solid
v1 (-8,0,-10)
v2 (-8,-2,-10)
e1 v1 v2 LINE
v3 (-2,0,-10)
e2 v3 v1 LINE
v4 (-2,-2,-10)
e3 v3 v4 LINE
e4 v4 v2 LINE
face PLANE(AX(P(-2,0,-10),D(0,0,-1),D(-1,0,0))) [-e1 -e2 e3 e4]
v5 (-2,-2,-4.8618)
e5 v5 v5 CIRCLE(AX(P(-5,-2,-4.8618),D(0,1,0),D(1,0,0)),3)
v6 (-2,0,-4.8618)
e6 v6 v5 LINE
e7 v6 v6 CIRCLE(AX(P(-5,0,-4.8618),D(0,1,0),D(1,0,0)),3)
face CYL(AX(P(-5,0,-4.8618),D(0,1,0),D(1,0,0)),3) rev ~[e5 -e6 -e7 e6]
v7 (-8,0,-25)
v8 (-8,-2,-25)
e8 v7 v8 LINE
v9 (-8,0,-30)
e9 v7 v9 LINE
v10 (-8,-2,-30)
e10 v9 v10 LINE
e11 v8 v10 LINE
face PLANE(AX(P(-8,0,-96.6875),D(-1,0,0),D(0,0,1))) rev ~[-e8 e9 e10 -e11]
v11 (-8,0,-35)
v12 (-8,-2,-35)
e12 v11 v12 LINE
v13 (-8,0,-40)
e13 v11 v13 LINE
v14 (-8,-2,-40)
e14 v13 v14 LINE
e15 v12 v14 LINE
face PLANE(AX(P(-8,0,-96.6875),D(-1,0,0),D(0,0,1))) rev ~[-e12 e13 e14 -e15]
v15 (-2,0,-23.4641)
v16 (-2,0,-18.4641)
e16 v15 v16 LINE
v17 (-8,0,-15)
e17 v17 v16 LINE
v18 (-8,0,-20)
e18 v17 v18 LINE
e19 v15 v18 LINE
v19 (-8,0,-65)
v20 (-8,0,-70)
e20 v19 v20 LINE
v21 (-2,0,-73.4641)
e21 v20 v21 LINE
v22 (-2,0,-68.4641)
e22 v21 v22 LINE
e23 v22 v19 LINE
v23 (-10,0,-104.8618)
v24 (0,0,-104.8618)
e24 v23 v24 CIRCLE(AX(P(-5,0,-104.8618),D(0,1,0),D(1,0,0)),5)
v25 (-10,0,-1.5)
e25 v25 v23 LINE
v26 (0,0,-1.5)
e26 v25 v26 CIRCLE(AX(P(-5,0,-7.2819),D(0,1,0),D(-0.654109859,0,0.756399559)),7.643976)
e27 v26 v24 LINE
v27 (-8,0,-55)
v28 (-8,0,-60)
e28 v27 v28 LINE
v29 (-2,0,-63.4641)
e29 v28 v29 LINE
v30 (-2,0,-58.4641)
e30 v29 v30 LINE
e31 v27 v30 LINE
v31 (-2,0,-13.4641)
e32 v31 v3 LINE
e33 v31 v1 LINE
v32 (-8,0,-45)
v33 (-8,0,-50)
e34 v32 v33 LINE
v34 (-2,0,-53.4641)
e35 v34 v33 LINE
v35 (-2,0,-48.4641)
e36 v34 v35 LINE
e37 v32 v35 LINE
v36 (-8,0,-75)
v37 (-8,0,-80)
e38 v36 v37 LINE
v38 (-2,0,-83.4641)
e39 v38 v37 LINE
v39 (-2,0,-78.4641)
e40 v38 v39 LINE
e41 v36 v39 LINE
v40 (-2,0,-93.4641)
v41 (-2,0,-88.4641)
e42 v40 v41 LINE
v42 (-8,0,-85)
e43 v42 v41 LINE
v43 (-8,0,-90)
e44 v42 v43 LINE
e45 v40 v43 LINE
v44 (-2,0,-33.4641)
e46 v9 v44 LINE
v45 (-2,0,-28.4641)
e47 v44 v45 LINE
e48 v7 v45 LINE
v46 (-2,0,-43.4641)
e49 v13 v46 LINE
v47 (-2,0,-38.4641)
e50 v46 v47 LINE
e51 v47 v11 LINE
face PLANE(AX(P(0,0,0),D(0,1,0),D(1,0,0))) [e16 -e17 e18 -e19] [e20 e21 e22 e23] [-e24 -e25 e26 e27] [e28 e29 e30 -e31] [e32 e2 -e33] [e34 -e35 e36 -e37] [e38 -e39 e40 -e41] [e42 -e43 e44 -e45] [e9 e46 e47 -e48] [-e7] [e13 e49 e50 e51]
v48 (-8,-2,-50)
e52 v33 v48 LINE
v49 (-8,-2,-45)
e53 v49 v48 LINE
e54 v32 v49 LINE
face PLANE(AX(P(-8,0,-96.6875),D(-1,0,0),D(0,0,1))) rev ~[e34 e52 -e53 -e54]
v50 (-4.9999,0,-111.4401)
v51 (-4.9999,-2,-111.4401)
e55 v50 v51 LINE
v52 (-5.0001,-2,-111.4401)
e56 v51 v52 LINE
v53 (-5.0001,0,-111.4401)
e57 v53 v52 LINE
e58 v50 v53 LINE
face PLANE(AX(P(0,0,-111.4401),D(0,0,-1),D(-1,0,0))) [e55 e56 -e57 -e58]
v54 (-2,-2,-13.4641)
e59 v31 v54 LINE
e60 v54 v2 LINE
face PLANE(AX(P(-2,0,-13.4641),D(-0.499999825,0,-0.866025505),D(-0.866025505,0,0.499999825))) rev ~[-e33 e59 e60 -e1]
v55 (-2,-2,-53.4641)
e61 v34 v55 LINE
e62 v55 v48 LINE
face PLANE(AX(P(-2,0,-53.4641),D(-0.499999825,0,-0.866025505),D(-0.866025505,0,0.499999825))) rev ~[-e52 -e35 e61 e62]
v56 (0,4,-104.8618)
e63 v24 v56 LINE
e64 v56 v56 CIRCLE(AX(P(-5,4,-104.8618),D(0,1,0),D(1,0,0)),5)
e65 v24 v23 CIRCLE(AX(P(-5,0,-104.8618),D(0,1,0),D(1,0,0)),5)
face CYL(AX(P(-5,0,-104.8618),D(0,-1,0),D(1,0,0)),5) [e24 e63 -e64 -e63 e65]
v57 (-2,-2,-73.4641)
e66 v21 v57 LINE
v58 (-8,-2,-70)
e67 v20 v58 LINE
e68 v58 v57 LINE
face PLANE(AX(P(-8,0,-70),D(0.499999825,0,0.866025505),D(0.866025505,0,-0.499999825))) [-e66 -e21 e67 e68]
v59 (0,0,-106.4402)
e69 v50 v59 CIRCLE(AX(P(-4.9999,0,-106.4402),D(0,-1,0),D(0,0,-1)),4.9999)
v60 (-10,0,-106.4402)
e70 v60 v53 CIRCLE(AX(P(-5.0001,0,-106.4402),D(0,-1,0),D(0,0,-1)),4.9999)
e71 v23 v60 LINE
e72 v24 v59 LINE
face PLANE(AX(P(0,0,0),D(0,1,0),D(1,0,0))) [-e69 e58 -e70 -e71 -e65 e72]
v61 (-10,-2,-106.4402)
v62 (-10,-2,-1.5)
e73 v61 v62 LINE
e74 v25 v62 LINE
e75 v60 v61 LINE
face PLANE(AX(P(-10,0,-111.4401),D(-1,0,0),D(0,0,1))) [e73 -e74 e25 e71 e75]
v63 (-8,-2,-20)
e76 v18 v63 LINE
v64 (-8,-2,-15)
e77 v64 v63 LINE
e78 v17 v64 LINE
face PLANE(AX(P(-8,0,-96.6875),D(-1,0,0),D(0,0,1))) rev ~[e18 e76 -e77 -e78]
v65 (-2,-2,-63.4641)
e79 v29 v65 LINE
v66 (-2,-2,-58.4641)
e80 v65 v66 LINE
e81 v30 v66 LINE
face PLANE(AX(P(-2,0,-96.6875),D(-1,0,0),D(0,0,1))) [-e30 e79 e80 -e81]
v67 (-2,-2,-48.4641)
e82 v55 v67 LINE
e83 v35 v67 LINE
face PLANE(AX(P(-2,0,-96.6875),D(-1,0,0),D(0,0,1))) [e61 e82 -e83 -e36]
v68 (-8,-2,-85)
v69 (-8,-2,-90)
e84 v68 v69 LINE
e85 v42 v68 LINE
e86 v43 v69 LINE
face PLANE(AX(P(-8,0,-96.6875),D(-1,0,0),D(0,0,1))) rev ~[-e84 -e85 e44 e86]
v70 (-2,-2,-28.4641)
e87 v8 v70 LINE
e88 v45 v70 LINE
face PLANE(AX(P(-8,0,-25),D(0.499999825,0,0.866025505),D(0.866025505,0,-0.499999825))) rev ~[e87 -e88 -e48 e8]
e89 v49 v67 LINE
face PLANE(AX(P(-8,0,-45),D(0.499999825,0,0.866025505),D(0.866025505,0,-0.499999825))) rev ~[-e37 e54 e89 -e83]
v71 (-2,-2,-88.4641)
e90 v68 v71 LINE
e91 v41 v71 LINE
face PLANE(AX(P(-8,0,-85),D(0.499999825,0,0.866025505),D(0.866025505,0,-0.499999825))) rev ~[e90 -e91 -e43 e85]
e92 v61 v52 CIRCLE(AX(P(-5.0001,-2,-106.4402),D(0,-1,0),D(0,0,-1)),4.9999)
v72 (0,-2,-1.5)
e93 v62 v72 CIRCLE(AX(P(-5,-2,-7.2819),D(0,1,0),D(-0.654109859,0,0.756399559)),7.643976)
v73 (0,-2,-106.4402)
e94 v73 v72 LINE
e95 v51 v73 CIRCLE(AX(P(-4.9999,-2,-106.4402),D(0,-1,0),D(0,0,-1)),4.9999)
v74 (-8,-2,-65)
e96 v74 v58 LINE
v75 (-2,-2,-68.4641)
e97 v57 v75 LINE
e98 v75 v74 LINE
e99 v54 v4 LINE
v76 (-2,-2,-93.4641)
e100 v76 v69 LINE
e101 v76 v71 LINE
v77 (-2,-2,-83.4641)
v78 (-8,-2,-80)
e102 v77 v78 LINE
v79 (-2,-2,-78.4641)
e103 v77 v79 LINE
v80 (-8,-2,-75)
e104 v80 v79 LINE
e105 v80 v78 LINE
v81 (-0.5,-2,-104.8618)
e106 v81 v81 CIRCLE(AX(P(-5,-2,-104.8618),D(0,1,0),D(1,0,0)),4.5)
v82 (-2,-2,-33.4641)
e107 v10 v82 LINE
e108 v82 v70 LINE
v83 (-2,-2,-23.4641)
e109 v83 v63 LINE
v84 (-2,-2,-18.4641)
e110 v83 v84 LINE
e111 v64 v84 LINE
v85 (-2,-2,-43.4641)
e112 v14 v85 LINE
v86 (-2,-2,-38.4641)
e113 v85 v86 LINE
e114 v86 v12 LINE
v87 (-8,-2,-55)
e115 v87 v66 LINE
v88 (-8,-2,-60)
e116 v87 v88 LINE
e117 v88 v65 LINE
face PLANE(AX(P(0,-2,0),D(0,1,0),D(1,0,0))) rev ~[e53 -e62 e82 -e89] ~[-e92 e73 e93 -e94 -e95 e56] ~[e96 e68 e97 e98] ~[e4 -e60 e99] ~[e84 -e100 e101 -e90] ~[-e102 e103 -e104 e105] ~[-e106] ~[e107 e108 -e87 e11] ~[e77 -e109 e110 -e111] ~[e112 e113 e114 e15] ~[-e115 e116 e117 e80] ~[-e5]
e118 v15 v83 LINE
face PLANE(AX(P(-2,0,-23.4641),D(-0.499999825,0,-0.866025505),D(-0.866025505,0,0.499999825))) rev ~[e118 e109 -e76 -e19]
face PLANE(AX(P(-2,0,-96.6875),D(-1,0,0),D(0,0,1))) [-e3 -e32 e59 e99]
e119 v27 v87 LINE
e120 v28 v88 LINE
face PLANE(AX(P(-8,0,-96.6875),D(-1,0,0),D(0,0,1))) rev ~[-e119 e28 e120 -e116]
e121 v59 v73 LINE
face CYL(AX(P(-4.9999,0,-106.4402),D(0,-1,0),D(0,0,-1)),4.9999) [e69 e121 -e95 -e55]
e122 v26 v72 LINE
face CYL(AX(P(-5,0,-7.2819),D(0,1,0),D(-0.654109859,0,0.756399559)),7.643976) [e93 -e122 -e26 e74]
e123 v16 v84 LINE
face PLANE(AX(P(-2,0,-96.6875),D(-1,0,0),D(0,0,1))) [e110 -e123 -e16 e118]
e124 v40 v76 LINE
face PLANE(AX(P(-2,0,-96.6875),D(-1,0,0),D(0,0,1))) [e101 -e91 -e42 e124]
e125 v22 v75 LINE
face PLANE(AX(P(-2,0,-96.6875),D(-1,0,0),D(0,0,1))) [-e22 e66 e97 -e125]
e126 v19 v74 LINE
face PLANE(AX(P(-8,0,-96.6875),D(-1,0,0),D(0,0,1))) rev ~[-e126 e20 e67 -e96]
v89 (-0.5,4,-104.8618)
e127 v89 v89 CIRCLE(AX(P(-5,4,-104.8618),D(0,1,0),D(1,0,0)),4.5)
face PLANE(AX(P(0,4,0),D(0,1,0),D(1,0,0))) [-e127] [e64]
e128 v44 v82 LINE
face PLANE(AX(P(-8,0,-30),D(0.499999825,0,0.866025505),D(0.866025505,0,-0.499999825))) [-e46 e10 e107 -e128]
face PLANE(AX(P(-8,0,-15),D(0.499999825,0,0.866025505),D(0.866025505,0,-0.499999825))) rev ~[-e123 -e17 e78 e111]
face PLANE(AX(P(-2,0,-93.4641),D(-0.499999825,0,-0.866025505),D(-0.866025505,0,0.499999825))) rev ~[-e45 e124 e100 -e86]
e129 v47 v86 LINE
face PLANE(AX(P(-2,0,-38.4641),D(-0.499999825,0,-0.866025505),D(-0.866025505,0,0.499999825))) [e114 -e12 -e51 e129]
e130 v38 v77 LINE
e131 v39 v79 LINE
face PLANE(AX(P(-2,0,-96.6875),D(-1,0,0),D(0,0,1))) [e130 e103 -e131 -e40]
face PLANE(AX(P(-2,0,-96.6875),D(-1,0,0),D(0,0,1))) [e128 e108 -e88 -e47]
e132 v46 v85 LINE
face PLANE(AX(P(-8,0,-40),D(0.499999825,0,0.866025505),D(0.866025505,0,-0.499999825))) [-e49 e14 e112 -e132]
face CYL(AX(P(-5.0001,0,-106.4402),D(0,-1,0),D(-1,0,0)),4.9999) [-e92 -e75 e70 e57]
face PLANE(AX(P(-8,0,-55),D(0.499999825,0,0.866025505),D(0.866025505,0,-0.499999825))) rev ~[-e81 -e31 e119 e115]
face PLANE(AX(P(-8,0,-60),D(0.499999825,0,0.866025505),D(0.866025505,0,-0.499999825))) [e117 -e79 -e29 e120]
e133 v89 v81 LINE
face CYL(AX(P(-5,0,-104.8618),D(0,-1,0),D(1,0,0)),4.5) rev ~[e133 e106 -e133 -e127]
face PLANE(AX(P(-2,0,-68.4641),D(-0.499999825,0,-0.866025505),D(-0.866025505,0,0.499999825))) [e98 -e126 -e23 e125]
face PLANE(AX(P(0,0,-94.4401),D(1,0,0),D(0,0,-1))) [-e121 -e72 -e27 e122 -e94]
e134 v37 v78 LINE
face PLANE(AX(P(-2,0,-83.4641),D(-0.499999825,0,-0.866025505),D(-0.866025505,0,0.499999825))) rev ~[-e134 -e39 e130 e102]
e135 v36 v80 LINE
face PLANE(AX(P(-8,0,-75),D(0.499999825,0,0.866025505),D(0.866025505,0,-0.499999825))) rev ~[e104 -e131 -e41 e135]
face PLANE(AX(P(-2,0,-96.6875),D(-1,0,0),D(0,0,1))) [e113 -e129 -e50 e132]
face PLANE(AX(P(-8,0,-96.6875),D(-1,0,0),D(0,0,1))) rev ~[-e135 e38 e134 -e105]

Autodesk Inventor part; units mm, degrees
ref_plane "YZ Plane" through (0, 0, 0) normal (1, 0, 0) x (0, 1, 0)
ref_plane "XZ Plane" through (0, 0, 0) normal (0, 1, 0) x (-1, 0, 0)
sketch "Szkic3" plane through (0, 0, 0) normal (0, 1, 0) x (-1, 0, 0)
  line L0 (0, 0) -> (10, 0)
  line L1 (10, 0) -> (10, -50)
  line L2 (10, -50) -> (0, -50)
  line L3 (0, -50) -> (0, 0)
  circle A0 centre (5, -5) radius 2.5
  arc A1 (10, -2.5) -> (0, -2.5) centre (5, -6.25) ccw
  line L4 (8, -50) -> (2, -50)
  line L5 (2, -50) -> (2, -10)
  line L6 (2, -10) -> (8, -10)
  line L7 (8, -10) -> (8, -50)
  line L8 (2, -10) -> (8, -16)
  line L9 (2, -10) -> (10.4853, -10) construction
  line L10 (8, -16) -> (8, -18)
  line L11 (8, -18) -> (2, -12)
  line L12 (2, -10) -> (2, -12)
  line L13 (8, -18) -> (8, -22)
  line L14 (2, -16) -> (8, -22)
  line L15 (8, -24) -> (2, -18)
  line L16 (8, -16) -> (8, -14)
  line L17 (8, -24) -> (8, -26)
  line L18 (2, -20) -> (8, -26)
  line L19 (8, -28) -> (2, -22)
  line L20 (8, -28) -> (8, -32)
  line L21 (2, -26) -> (8, -32)
  line L22 (8, -34) -> (2, -28)
  line L23 (8, -34) -> (8, -36)
  line L24 (2, -26) -> (8, -32)
  line L25 (8, -34) -> (2, -28)
  line L26 (8, -34) -> (8, -38)
  line L27 (2, -32) -> (8, -38)
  line L28 (8, -40) -> (2, -34)
  line L29 (8, -40) -> (8, -42)
  line L30 (2, -32) -> (8, -38)
  line L31 (8, -40) -> (2, -34)
  line L32 (8, -40) -> (8, -44)
  line L33 (2, -38) -> (8, -44)
  line L34 (8, -46) -> (2, -40)
  line L35 (8, -46) -> (8, -48)
  line L36 (2, -38) -> (8, -44)
  line L37 (8, -46) -> (2, -40)
  line L38 (8, -46) -> (8, -50)
  line L39 (8, -46) -> (8, -48)
  line L40 (8, -48) -> (2, -42)
  line L41 (2, -42) -> (2, -44)
  line L42 (2, -44) -> (8, -50)
  line L43 (7, -49) -> (2, -49)
  circle A2 centre (5, -5) radius 3.25
  dimension "d9" = 10
  dimension "d10" = 50
  dimension "d11" = 5
  dimension "d12" = 6
  dimension "d13" = 40
  dimension "d14" = 45
  dimension "d15" = 2
  dimension "d16" = 4
  dimension "d17" = 2
  dimension "d18" = 2
  dimension "d19" = 2
  dimension "d20" = 2
  dimension "d21" = 4
  dimension "d22" = 2
  dimension "d23" = 2
  dimension "d24" = 2
  dimension "d25" = 4
  dimension "d26" = 2
  dimension "d27" = 2
  dimension "d28" = 2
  dimension "d29" = 4
  dimension "d30" = 2
  dimension "d32" = 2
  dimension "d36" = 2
  dimension "d37" = 2
  dimension "d42" = 6.5
extrude "Wyciągnięcie proste2" add sketch "Szkic3" against normal blind 2 contours A1 L1 L2 L7 L6 L5 L3 | L5 L43 L42 L2 | L42 L5 L40 L7 | L34 L5 L33 L7 | L28 L5 L27 L7 | L5 L21 L7 L22 | L5 L18 L7 L19 | L5 L14 L7 L15 | L5 L8 L7 L11 | A2
ref_plane "Płaszczyzna konstrukcyjna1" through (0, 0, -50) normal (0, 0, -1) x (-1, 0, 0)
mirror "Odbij1" about plane through (0, 0, -50) normal (0, 0, -1) of "Wyciągnięcie proste2"
sketch "Szkic4" plane through (0, 0, 0) normal (0, 1, 0) x (1, 0, 0)
  line L0 (-7.5, 91.0504) -> (-2.5, 91.0504)
  line L1 (-2.5, 91.0504) -> (-2.5, 98.6571)
  line L2 (-2.5, 98.6571) -> (-7.5, 98.6571)
  line L3 (-7.5, 98.6571) -> (-7.5, 91.0504)
  point P0 (0, 0)
extrude "Wyciągnięcie proste3" cut sketch "Szkic4" against normal blind 2
sketch "Szkic5" plane through (0, 0, 0) normal (0, 1, 0) x (1, 0, 0)
  line L0 (-10, 2.5) -> (-10, 97.5) projected
  line L1 (-10, 97.5) -> (-10, 67.5)
  line L2 (-10, 67.5) -> (-13, 67.5)
  line L3 (-13, 67.5) -> (-13, 97.5)
  line L4 (-13, 97.5) -> (-10, 97.5)
  arc A0 (0, 97.5) -> (-10, 97.5) centre (-5, 93.75) ccw projected
  line L5 (-5, 100) -> (-5, 49.8742)
  line L6 (-5, 100) -> (45.1258, 100) construction
  line L7 (-13, 67.5) -> (-10, 62.3038)
  line L8 (-13, 67.5) -> (-7, 67.5) construction
  line L9 (-10, 62.3038) -> (-10, 67.5)
  line L10 (0, 2.5) -> (0, 97.5)
  line L11 (0, 67.5) -> (3, 67.5)
  line L12 (3, 67.5) -> (3, 97.5)
  line L13 (3, 97.5) -> (0, 97.5)
  line L14 (3, 67.5) -> (0, 62.3038)
  arc A1 (3, 97.5) -> (-13, 97.5) centre (-5, 94.4495) ccw
  point P0 (0, 0)
  dimension "d43" = 30
  dimension "d44" = 3
  dimension "d45" = 90
  dimension "d46" = 60
extrude "Wyciągnięcie proste4" add sketch "Szkic5" against normal blind 2
sketch "Szkic6" plane through (0, 0, 0) normal (0, 1, 0) x (1, 0, 0)
  line L0 (-10, 62.3038) -> (-10, 2.5) projected
  line L1 (-10, 62.3038) -> (-10, 97.356)
  line L2 (-10, 97.356) -> (0, 97.356)
  line L3 (0, 97.356) -> (0, 62.3038)
  line L4 (0, 62.3038) -> (-10, 62.3038)
  point P0 (0, 0)
extrude "Wyciągnięcie proste5" cut sketch "Szkic6" against normal blind 2
sketch "Szkic7" plane through (0, 0, 0) normal (0, 1, 0) x (1, 0, 0)
  line L0 (-10, 62.3038) -> (-8, 62.3038) projected
  line L1 (-10, 62.3038) -> (-10, 67.4287)
  line L2 (-10, 62.3038) -> (-10, 97.356) projected
  line L3 (-10, 67.4287) -> (0, 67.4287)
  line L4 (0, 62.3038) -> (0, 97.356) projected
  line L5 (0, 62.3038) -> (0, 67.4287)
  line L6 (0, 62.3038) -> (-2, 62.3038) projected
  line L7 (-10, 2.5) -> (-10, 62.3038) projected
  line L8 (0, 62.3038) -> (-10, 62.3038)
  line L9 (-10, 62.3038) -> (-10, 61.2351)
  line L10 (-10, 61.2351) -> (0, 61.2351)
  line L11 (0, 61.2351) -> (0, 62.3038)
  line L12 (-10, 61.2351) -> (0, 61.2351)
  line L13 (0, 2.5) -> (0, 62.3038) projected
  line L14 (0, 61.2351) -> (0, 67.4287)
  line L15 (0, 67.4287) -> (-10, 67.4287)
  line L16 (-10, 61.2351) -> (-10, 67.4287)
  point P0 (0, 0)
extrude "Wyciągnięcie proste6" add sketch "Szkic7" against normal blind 2
sketch "Szkic8" plane through (0, 0, 0) normal (0, 1, 0) x (1, 0, 0)
  line L0 (-7.5, 97.356) -> (-10, 97.356) projected
  line L1 (-10, 97.356) -> (-11, 97.356)
  line L2 (-11, 97.356) -> (-11, 67.4287)
  line L3 (-11, 67.4287) -> (-10, 67.4287)
  line L4 (-10, 67.4287) -> (-10, 97.356)
  line L5 (0, 97.356) -> (1, 97.356)
  line L6 (1, 97.356) -> (1, 67.4287)
  line L7 (1, 67.4287) -> (0, 67.4287)
  line L8 (0, 67.4287) -> (0, 97.356)
  line L9 (-11, 67.4287) -> (1, 67.4287)
  line L10 (1, 67.4287) -> (1, 72.7222)
  line L11 (1, 72.7222) -> (-11, 72.7222)
  line L12 (-11, 72.7222) -> (-11, 67.4287)
  point P0 (0, 0)
  point P1 (0, 72.7222)
  point P2 (-10, 72.7222)
  dimension "d53" = 1
  dimension "d54" = 1
extrude "Wyciągnięcie proste7" cut sketch "Szkic8" against normal blind 2 contours L4 L11 L2 L1 | L8 L5 L6 L11
sketch "Szkic9" plane through (0, 0, 0) normal (0, 1, 0) x (1, 0, 0)
  line L0 (-10, 72.7222) -> (0, 72.7222)
  line L1 (0, 72.7222) -> (0, 67.3617)
  line L2 (0, 67.3617) -> (-10, 67.3617)
  line L3 (-10, 67.3617) -> (-10, 72.7222)
  point P0 (0, 0)
extrude "Wyciągnięcie proste8" add sketch "Szkic9" against normal blind 2
sketch "Szkic10" plane through (0, 0, 0) normal (0, 1, 0) x (1, 0, 0)
  point P0 (0, 0)
split "Podział1" plane through (0, 0, -50) removes the side toward (0, 0, -1)
sketch "Szkic11" plane through (0, 0, 0) normal (0, 1, 0) x (1, 0, 0)
  line L0 (-10, 2.5) -> (-10, 50) projected
  line L1 (-10, 50) -> (0, 50)
  line L2 (0, 50) -> (0, 100)
  line L3 (0, 100) -> (-10, 100)
  line L4 (-10, 100) -> (-10, 50)
  line L5 (-10, 100) -> (0, 100)
  line L6 (0, 100) -> (0, 124.634)
  line L7 (0, 124.634) -> (-10, 124.634)
  line L8 (-10, 124.634) -> (-10, 100)
  line L9 (-10, 124.634) -> (-11, 124.634)
  line L10 (-11, 124.634) -> (-11, 100)
  line L11 (-11, 100) -> (-10, 100)
  line L12 (-10, 100) -> (-10, 124.634)
  line L13 (0, 124.634) -> (1, 124.634)
  line L14 (1, 124.634) -> (1, 100)
  line L15 (1, 100) -> (0, 100)
  line L16 (0, 100) -> (0, 124.634)
  line L17 (-11, 100) -> (-9, 100) construction
  line L18 (1, 100) -> (3, 100) construction
  line L19 (-11, 124.634) -> (1, 124.634)
  line L20 (1, 124.634) -> (1, 126.634)
  line L21 (1, 126.634) -> (-11, 126.634)
  line L22 (-11, 126.634) -> (-11, 124.634)
  line L23 (-11, 100) -> (-12, 100)
  line L24 (-12, 100) -> (-12, 126.634)
  line L25 (-12, 126.634) -> (-11, 126.634)
  line L26 (-11, 126.634) -> (-11, 100)
  line L27 (1, 126.634) -> (2, 126.634)
  line L28 (2, 126.634) -> (2, 100)
  line L29 (2, 100) -> (1, 100)
  line L30 (1, 100) -> (1, 126.634)
  line L31 (-12, 100) -> (-10, 96.5359)
  line L32 (-12, 100) -> (-8, 100) construction
  line L33 (2, 100) -> (0, 96.5359)
  line L34 (2, 100) -> (6, 100) construction
  line L35 (-10, 124.634) -> (-10.5, 124.634)
  line L36 (-10.5, 124.634) -> (-10.5, 100)
  line L37 (0.5, 100) -> (0.5, 124.634)
  line L38 (0.75, 100) -> (0.75, 124.634)
  line L39 (-11, 100) -> (-10.75, 100)
  line L40 (-10.75, 100) -> (-10.75, 124.634)
  point P0 (0, 0)
  dimension "d59" = 10
  dimension "d60" = 50
  dimension "d61" = 10
  dimension "d62" = 24.634
  dimension "d63" = 1
  dimension "d64" = 1
  dimension "d67" = 2
  dimension "d68" = 1
  dimension "d69" = 1
  dimension "d70" = 60
  dimension "d71" = 120
  dimension "d90" = 0.5
  dimension "d107" = 0.25
extrude "Wyciągnięcie proste9" add sketch "Szkic11" against normal blind 2 contours L4 L3 L2 L1 | L31 L23 L11 L4 | L2 L15 L29 L33 | L24 L25 L22 L10 L23 | L29 L14 L20 L27 L28 | L9 L22 L21 L20 L13 L7
sketch "Szkic12" plane through (0, 0, 0) normal (0, 1, 0) x (1, 0, 0)
  line L0 (-8, 51.0298) -> (-2, 51.0298)
  line L1 (-2, 51.0298) -> (-2, 96.6875)
  line L2 (-2, 96.6875) -> (-8, 96.6875)
  line L3 (-8, 96.6875) -> (-8, 51.0298)
  line L4 (-8, 51.0298) -> (-2, 54.4939)
  line L5 (-8, 51.0298) -> (-1.0718, 51.0298) construction
  line L6 (-2, 54.4939) -> (-2, 59.4939)
  line L7 (-2, 59.4939) -> (-8, 56.0298)
  line L8 (-8, 51.0298) -> (-8, 56.0298)
  line L9 (-8, 56.0298) -> (-8, 61.0298)
  line L10 (-8, 61.0298) -> (-2, 64.4939)
  line L11 (-2, 64.4939) -> (-2, 69.4939)
  line L12 (-2, 69.4939) -> (-8, 66.0298)
  line L13 (-8, 61.0298) -> (-8, 66.0298)
  line L14 (-8, 66.0298) -> (-2, 69.4939)
  line L15 (-2, 74.4939) -> (-8, 71.0298)
  line L16 (-8, 76.0298) -> (-2, 79.4939)
  line L17 (-2, 84.4939) -> (-8, 81.0298)
  line L18 (-8, 71.0298) -> (-2, 74.4939)
  line L19 (-2, 79.4939) -> (-8, 76.0298)
  line L20 (-8, 81.0298) -> (-2, 84.4939)
  line L21 (-2, 89.4939) -> (-8, 86.0298)
  line L22 (-8, 76.0298) -> (-2, 79.4939)
  line L23 (-2, 84.4939) -> (-8, 81.0298)
  line L24 (-8, 86.0298) -> (-2, 89.4939)
  line L25 (-2, 94.4939) -> (-8, 91.0298)
  point P0 (0, 0)
  dimension "d74" = 30
  dimension "d75" = 5
  dimension "d76" = 5
  dimension "d77" = 5
  dimension "d78" = 5
  dimension "d79" = 5
  dimension "d80" = 5
  dimension "d81" = 5
  dimension "d82" = 5
  dimension "d83" = 5
  dimension "d84" = 5
  dimension "d85" = 5
  dimension "d86" = 5
extrude "Wyciągnięcie proste10" cut sketch "Szkic12" against normal blind 2 contours L3 L7 L1 L4 | L3 L12 L1 L10 | L3 L16 L1 L15 | L3 L21 L1 L17 | L3 L2 L1 L25
sketch "Szkic14" plane through (0, 0, 0) normal (0, 1, 0) x (1, 0, 0)
  arc A0 (5, 2.5) -> (15, 2.5) centre (10, 6.2465) ccw
  circle A1 centre (10, 5) radius 2.5
  line L0 (5, 2.5) -> (5, 5)
  line L1 (15, 2.5) -> (15, 5)
  line L2 (5, 5) -> (10, 104.8749)
  line L3 (10, 104.8749) -> (15, 5)
  line L4 (5.1827, 8.65) -> (14.8173, 8.65)
  line L5 (6.9979, 8.65) -> (12.6647, 8.65) construction
  line L6 (5.1827, 8.65) -> (7.1827, 8.65)
  line L7 (14.8173, 8.65) -> (12.8173, 8.65)
  line L8 (12.8173, 8.65) -> (9.8313, 56.0603)
  line L9 (9.8313, 56.0603) -> (7.1827, 8.65)
  line L10 (7.2581, 10) -> (12.7322, 10)
  point P0 (0, 0)
  dimension "d91" = 10
  dimension "d92" = 5
  dimension "d93" = 100
  dimension "d103" = 2
  dimension "d104" = 2
extrude "Wyciągnięcie proste11" add sketch "Szkic14" against normal blind 2 contours L0 L2 L4 L3 L1 A0 | L2 L3 L4 L8 L9 | L9 L10 L8 L4
sketch "Szkic15" plane through (0, 0, 0) normal (0, 1, 0) x (1, 0, 0)
  line L0 (-8, 91.0298) -> (-8, 96.6875) projected
  line L1 (-2, 10) -> (-8, 10) projected
  line L2 (-8, 96.6875) -> (-2, 96.6875)
  line L3 (-2, 96.6875) -> (-2, 10)
  line L4 (-2, 10) -> (-8, 10)
  line L5 (-8, 10) -> (-8, 96.6875)
  point P0 (0, 0)
extrude "Wyciągnięcie proste12" cut sketch "Szkic15" against normal blind 2
sketch "Szkic19" plane through (2, 0, -100) normal (1, 0, 0) x (0, 0, -1)
  line L0 (39.9881, 21.4734) -> (-120.2221, 21.4734)
  line L1 (-120.2221, 21.4734) -> (-120.2221, -34.3653)
  line L2 (-120.2221, -34.3653) -> (39.9881, -34.3653)
  line L3 (39.9881, -34.3653) -> (39.9881, 21.4734)
  point P0 (-100, 0)
extrude "Wyciągnięcie proste16" cut sketch "Szkic19" along normal blind 34.5
sketch "Szkic20" plane through (0, 0, 0) normal (0, 1, 0) x (1, 0, 0)
  line L0 (-8, 10) -> (-8, 15)
  line L1 (-8, 10) -> (-8, 96.6875) projected
  line L2 (-8, 15) -> (-2, 18.4641)
  line L3 (-2, 96.6875) -> (-2, 10) projected
  line L4 (-2, 18.4641) -> (-2, 13.4641)
  line L5 (-2, 13.4641) -> (-8, 10)
  line L6 (-2, 18.4641) -> (-2, 23.4641)
  line L7 (-2, 23.4641) -> (-8, 20)
  line L8 (-8, 20) -> (-8, 15)
  line L9 (-8, 20) -> (-8, 25)
  line L10 (-8, 25) -> (-2, 28.4641)
  line L11 (-2, 28.4641) -> (-2, 23.4641)
  line L12 (-8, 30) -> (-2, 33.4641)
  line L13 (-2, 28.4641) -> (-8, 25)
  line L14 (-2, 38.4641) -> (-8, 35)
  line L15 (-8, 40) -> (-2, 43.4641)
  line L16 (-8, 45) -> (-2, 48.4641)
  line L17 (-2, 43.4641) -> (-8, 40)
  line L18 (-2, 53.4641) -> (-8, 50)
  line L19 (-8, 55) -> (-2, 58.4641)
  line L20 (-8, 60) -> (-2, 63.4641)
  line L21 (-2, 58.4641) -> (-8, 55)
  line L22 (-2, 68.4641) -> (-8, 65)
  line L23 (-8, 70) -> (-2, 73.4641)
  line L24 (-8, 75) -> (-2, 78.4641)
  line L25 (-2, 73.4641) -> (-8, 70)
  line L26 (-2, 83.4641) -> (-8, 80)
  line L27 (-8, 85) -> (-2, 88.4641)
  line L28 (-8, 85) -> (-2, 88.4641)
  line L29 (-2, 83.4641) -> (-8, 80)
  line L30 (-2, 93.4641) -> (-8, 90)
  line L31 (-8, 95) -> (-2, 98.4641)
  line L32 (-2, 93.4641) -> (-2, 96.6875)
  line L33 (-2, 96.6875) -> (-5, 96.7321)
  line L34 (-8, 95) -> (-8, 90)
  dimension "d149" = 5
  dimension "d150" = 120
  dimension "d151" = 5
  dimension "d152" = 5
  dimension "d153" = 5
  dimension "d154" = 5
  dimension "d155" = 5
  dimension "d156" = 5
  dimension "d157" = 5
  dimension "d158" = 5
  dimension "d159" = 5
  dimension "d160" = 5
  dimension "d161" = 5
  dimension "d162" = 5
  dimension "d163" = 5
  dimension "d164" = 5
  dimension "d165" = 5
  dimension "d166" = 5
  dimension "d167" = 5
  dimension "d168" = 5
  dimension "d169" = 5
  dimension "d170" = 5
  dimension "d171" = 5
  dimension "d172" = 5
  dimension "d173" = 5
extrude "Wyciągnięcie proste17" add sketch "Szkic20" against normal blind 2 contours L0 L2 L3 L5 | L1 L10 L3 L7 | L1 L14 L3 L12 | L1 L16 L3 L15 | L1 L19 L3 L18 | L1 L22 L3 L20 | L1 L24 L3 L23 | L1 L27 L3 L26 | L1 L31 L33 L3 L30
sketch "Szkic21" plane through (0, 0, 0) normal (0, 1, 0) x (1, 0, 0)
  circle A0 centre (-5, 5) radius 2.5 projected
  circle A1 centre (-5, 5) radius 2.75
  point P0 (0, 0)
  dimension "d176" = 5.5
extrude "Wyciągnięcie proste18" cut sketch "Szkic21" against normal blind 2
sketch "Szkic22" plane through (0, 0, 0) normal (0, 1, 0) x (1, 0, 0)
  line L0 (-11, 100) -> (1, 100) projected
  line L1 (-5, 100) -> (-7, 100)
  line L2 (-7, 100) -> (-7, 98)
  line L3 (-7, 98) -> (-5, 98)
  line L4 (-5, 98) -> (-5, 100)
  line L5 (-5, 100) -> (-3, 100)
  line L6 (-3, 100) -> (-3, 98)
  line L7 (-3, 98) -> (-5, 98)
  line L8 (-5, 98) -> (-5, 100)
  circle A0 centre (-5, 4.8618) radius 4.375
  point P0 (0, 0)
  dimension "d179" = 2
  dimension "d180" = 2
  dimension "d181" = 2
  dimension "d182" = 2
  dimension "d183" = 8.75
extrude "Wyciągnięcie proste19" cut sketch "Szkic22" against normal blind 2
sketch "Szkic23" plane through (0, 0, 0) normal (0, 1, 0) x (1, 0, 0)
  arc A0 (-10, 2.5) -> (0, 2.5) centre (-5, 6.25) ccw projected
  line L0 (-10, 2.5) -> (-10, 1.5)
  line L1 (0, 2.5) -> (0, 1.5)
  arc A1 (-10, 1.5) -> (0, 1.5) centre (-5, 7.2819) ccw
  point P0 (0, 0)
  dimension "d186" = 1
  dimension "d187" = 1
extrude "Wyciągnięcie proste20" add sketch "Szkic23" against normal blind 2
sketch "Szkic24" plane through (0, 0, 0) normal (0, 1, 0) x (1, 0, 0)
  circle A0 centre (-5, 4.8618) radius 4.375 projected
  circle A1 centre (-5, 4.8618) radius 3.5
  circle A2 centre (-5, 4.8618) radius 4.375
  circle A3 centre (-5, 4.8618) radius 3
  point P0 (0, 0)
  dimension "d190" = 7
  dimension "d191" = 6
extrude "Wyciągnięcie proste21" add sketch "Szkic24" against normal blind 2 contours A0 | A1
sketch "Szkic25" plane through (0, 0, 0) normal (0, 1, 0) x (1, 0, 0)
  line L0 (3.7776, 94.4401) -> (-14.9005, 94.4401)
  line L1 (-14.9005, 94.4401) -> (-14.9005, 129.9076)
  line L2 (-14.9005, 129.9076) -> (3.7776, 129.9076)
  line L3 (3.7776, 129.9076) -> (3.7776, 94.4401)
  point P0 (0, 0)
extrude "Wyciągnięcie proste22" cut sketch "Szkic25" against normal blind 2
sketch "Szkic26" plane through (0, 0, 0) normal (0, 1, 0) x (1, 0, 0)
  circle A0 centre (-5, 4.8618) radius 3 projected
  line L0 (-5, 4.8618) -> (-5, 104.8618)
  line L1 (-5, 4.8618) -> (95, 4.8618) construction
  circle A1 centre (-5, 104.8618) radius 4.5
  line L2 (-10, 1.5) -> (-10, 94.4401) projected
  line L3 (-10, 94.4401) -> (0, 94.4401)
  line L4 (0, 94.4401) -> (0, 111.4401)
  line L5 (0, 111.4401) -> (-10, 111.4401)
  line L6 (-10, 111.4401) -> (-10, 94.4401)
  point P0 (0, 0)
  dimension "d196" = 100
  dimension "d197" = 90
  dimension "d198" = 9
  dimension "d199" = 17
extrude "Wyciągnięcie proste23" add sketch "Szkic26" against normal blind 2 contours L6 L5 L4 L3
fillet "Zaokrąglenie1" radius 5 2 edges at (-10, -1, -111.4401) (0, -1, -111.4401)
sketch "Szkic27" plane through (0, 0, 0) normal (0, 1, 0) x (1, 0, 0)
  circle A0 centre (-5, 104.8618) radius 4.5 projected
  circle A1 centre (-5, 104.8618) radius 4.5
  circle A2 centre (-5, 104.8618) radius 5
  line L0 (0, 1.5) -> (0, 106.4401) projected
  point P0 (0, 0)
extrude "Wyciągnięcie proste24" add sketch "Szkic27" along normal blind 4
properties part number "arm_v2(base-arm)"
